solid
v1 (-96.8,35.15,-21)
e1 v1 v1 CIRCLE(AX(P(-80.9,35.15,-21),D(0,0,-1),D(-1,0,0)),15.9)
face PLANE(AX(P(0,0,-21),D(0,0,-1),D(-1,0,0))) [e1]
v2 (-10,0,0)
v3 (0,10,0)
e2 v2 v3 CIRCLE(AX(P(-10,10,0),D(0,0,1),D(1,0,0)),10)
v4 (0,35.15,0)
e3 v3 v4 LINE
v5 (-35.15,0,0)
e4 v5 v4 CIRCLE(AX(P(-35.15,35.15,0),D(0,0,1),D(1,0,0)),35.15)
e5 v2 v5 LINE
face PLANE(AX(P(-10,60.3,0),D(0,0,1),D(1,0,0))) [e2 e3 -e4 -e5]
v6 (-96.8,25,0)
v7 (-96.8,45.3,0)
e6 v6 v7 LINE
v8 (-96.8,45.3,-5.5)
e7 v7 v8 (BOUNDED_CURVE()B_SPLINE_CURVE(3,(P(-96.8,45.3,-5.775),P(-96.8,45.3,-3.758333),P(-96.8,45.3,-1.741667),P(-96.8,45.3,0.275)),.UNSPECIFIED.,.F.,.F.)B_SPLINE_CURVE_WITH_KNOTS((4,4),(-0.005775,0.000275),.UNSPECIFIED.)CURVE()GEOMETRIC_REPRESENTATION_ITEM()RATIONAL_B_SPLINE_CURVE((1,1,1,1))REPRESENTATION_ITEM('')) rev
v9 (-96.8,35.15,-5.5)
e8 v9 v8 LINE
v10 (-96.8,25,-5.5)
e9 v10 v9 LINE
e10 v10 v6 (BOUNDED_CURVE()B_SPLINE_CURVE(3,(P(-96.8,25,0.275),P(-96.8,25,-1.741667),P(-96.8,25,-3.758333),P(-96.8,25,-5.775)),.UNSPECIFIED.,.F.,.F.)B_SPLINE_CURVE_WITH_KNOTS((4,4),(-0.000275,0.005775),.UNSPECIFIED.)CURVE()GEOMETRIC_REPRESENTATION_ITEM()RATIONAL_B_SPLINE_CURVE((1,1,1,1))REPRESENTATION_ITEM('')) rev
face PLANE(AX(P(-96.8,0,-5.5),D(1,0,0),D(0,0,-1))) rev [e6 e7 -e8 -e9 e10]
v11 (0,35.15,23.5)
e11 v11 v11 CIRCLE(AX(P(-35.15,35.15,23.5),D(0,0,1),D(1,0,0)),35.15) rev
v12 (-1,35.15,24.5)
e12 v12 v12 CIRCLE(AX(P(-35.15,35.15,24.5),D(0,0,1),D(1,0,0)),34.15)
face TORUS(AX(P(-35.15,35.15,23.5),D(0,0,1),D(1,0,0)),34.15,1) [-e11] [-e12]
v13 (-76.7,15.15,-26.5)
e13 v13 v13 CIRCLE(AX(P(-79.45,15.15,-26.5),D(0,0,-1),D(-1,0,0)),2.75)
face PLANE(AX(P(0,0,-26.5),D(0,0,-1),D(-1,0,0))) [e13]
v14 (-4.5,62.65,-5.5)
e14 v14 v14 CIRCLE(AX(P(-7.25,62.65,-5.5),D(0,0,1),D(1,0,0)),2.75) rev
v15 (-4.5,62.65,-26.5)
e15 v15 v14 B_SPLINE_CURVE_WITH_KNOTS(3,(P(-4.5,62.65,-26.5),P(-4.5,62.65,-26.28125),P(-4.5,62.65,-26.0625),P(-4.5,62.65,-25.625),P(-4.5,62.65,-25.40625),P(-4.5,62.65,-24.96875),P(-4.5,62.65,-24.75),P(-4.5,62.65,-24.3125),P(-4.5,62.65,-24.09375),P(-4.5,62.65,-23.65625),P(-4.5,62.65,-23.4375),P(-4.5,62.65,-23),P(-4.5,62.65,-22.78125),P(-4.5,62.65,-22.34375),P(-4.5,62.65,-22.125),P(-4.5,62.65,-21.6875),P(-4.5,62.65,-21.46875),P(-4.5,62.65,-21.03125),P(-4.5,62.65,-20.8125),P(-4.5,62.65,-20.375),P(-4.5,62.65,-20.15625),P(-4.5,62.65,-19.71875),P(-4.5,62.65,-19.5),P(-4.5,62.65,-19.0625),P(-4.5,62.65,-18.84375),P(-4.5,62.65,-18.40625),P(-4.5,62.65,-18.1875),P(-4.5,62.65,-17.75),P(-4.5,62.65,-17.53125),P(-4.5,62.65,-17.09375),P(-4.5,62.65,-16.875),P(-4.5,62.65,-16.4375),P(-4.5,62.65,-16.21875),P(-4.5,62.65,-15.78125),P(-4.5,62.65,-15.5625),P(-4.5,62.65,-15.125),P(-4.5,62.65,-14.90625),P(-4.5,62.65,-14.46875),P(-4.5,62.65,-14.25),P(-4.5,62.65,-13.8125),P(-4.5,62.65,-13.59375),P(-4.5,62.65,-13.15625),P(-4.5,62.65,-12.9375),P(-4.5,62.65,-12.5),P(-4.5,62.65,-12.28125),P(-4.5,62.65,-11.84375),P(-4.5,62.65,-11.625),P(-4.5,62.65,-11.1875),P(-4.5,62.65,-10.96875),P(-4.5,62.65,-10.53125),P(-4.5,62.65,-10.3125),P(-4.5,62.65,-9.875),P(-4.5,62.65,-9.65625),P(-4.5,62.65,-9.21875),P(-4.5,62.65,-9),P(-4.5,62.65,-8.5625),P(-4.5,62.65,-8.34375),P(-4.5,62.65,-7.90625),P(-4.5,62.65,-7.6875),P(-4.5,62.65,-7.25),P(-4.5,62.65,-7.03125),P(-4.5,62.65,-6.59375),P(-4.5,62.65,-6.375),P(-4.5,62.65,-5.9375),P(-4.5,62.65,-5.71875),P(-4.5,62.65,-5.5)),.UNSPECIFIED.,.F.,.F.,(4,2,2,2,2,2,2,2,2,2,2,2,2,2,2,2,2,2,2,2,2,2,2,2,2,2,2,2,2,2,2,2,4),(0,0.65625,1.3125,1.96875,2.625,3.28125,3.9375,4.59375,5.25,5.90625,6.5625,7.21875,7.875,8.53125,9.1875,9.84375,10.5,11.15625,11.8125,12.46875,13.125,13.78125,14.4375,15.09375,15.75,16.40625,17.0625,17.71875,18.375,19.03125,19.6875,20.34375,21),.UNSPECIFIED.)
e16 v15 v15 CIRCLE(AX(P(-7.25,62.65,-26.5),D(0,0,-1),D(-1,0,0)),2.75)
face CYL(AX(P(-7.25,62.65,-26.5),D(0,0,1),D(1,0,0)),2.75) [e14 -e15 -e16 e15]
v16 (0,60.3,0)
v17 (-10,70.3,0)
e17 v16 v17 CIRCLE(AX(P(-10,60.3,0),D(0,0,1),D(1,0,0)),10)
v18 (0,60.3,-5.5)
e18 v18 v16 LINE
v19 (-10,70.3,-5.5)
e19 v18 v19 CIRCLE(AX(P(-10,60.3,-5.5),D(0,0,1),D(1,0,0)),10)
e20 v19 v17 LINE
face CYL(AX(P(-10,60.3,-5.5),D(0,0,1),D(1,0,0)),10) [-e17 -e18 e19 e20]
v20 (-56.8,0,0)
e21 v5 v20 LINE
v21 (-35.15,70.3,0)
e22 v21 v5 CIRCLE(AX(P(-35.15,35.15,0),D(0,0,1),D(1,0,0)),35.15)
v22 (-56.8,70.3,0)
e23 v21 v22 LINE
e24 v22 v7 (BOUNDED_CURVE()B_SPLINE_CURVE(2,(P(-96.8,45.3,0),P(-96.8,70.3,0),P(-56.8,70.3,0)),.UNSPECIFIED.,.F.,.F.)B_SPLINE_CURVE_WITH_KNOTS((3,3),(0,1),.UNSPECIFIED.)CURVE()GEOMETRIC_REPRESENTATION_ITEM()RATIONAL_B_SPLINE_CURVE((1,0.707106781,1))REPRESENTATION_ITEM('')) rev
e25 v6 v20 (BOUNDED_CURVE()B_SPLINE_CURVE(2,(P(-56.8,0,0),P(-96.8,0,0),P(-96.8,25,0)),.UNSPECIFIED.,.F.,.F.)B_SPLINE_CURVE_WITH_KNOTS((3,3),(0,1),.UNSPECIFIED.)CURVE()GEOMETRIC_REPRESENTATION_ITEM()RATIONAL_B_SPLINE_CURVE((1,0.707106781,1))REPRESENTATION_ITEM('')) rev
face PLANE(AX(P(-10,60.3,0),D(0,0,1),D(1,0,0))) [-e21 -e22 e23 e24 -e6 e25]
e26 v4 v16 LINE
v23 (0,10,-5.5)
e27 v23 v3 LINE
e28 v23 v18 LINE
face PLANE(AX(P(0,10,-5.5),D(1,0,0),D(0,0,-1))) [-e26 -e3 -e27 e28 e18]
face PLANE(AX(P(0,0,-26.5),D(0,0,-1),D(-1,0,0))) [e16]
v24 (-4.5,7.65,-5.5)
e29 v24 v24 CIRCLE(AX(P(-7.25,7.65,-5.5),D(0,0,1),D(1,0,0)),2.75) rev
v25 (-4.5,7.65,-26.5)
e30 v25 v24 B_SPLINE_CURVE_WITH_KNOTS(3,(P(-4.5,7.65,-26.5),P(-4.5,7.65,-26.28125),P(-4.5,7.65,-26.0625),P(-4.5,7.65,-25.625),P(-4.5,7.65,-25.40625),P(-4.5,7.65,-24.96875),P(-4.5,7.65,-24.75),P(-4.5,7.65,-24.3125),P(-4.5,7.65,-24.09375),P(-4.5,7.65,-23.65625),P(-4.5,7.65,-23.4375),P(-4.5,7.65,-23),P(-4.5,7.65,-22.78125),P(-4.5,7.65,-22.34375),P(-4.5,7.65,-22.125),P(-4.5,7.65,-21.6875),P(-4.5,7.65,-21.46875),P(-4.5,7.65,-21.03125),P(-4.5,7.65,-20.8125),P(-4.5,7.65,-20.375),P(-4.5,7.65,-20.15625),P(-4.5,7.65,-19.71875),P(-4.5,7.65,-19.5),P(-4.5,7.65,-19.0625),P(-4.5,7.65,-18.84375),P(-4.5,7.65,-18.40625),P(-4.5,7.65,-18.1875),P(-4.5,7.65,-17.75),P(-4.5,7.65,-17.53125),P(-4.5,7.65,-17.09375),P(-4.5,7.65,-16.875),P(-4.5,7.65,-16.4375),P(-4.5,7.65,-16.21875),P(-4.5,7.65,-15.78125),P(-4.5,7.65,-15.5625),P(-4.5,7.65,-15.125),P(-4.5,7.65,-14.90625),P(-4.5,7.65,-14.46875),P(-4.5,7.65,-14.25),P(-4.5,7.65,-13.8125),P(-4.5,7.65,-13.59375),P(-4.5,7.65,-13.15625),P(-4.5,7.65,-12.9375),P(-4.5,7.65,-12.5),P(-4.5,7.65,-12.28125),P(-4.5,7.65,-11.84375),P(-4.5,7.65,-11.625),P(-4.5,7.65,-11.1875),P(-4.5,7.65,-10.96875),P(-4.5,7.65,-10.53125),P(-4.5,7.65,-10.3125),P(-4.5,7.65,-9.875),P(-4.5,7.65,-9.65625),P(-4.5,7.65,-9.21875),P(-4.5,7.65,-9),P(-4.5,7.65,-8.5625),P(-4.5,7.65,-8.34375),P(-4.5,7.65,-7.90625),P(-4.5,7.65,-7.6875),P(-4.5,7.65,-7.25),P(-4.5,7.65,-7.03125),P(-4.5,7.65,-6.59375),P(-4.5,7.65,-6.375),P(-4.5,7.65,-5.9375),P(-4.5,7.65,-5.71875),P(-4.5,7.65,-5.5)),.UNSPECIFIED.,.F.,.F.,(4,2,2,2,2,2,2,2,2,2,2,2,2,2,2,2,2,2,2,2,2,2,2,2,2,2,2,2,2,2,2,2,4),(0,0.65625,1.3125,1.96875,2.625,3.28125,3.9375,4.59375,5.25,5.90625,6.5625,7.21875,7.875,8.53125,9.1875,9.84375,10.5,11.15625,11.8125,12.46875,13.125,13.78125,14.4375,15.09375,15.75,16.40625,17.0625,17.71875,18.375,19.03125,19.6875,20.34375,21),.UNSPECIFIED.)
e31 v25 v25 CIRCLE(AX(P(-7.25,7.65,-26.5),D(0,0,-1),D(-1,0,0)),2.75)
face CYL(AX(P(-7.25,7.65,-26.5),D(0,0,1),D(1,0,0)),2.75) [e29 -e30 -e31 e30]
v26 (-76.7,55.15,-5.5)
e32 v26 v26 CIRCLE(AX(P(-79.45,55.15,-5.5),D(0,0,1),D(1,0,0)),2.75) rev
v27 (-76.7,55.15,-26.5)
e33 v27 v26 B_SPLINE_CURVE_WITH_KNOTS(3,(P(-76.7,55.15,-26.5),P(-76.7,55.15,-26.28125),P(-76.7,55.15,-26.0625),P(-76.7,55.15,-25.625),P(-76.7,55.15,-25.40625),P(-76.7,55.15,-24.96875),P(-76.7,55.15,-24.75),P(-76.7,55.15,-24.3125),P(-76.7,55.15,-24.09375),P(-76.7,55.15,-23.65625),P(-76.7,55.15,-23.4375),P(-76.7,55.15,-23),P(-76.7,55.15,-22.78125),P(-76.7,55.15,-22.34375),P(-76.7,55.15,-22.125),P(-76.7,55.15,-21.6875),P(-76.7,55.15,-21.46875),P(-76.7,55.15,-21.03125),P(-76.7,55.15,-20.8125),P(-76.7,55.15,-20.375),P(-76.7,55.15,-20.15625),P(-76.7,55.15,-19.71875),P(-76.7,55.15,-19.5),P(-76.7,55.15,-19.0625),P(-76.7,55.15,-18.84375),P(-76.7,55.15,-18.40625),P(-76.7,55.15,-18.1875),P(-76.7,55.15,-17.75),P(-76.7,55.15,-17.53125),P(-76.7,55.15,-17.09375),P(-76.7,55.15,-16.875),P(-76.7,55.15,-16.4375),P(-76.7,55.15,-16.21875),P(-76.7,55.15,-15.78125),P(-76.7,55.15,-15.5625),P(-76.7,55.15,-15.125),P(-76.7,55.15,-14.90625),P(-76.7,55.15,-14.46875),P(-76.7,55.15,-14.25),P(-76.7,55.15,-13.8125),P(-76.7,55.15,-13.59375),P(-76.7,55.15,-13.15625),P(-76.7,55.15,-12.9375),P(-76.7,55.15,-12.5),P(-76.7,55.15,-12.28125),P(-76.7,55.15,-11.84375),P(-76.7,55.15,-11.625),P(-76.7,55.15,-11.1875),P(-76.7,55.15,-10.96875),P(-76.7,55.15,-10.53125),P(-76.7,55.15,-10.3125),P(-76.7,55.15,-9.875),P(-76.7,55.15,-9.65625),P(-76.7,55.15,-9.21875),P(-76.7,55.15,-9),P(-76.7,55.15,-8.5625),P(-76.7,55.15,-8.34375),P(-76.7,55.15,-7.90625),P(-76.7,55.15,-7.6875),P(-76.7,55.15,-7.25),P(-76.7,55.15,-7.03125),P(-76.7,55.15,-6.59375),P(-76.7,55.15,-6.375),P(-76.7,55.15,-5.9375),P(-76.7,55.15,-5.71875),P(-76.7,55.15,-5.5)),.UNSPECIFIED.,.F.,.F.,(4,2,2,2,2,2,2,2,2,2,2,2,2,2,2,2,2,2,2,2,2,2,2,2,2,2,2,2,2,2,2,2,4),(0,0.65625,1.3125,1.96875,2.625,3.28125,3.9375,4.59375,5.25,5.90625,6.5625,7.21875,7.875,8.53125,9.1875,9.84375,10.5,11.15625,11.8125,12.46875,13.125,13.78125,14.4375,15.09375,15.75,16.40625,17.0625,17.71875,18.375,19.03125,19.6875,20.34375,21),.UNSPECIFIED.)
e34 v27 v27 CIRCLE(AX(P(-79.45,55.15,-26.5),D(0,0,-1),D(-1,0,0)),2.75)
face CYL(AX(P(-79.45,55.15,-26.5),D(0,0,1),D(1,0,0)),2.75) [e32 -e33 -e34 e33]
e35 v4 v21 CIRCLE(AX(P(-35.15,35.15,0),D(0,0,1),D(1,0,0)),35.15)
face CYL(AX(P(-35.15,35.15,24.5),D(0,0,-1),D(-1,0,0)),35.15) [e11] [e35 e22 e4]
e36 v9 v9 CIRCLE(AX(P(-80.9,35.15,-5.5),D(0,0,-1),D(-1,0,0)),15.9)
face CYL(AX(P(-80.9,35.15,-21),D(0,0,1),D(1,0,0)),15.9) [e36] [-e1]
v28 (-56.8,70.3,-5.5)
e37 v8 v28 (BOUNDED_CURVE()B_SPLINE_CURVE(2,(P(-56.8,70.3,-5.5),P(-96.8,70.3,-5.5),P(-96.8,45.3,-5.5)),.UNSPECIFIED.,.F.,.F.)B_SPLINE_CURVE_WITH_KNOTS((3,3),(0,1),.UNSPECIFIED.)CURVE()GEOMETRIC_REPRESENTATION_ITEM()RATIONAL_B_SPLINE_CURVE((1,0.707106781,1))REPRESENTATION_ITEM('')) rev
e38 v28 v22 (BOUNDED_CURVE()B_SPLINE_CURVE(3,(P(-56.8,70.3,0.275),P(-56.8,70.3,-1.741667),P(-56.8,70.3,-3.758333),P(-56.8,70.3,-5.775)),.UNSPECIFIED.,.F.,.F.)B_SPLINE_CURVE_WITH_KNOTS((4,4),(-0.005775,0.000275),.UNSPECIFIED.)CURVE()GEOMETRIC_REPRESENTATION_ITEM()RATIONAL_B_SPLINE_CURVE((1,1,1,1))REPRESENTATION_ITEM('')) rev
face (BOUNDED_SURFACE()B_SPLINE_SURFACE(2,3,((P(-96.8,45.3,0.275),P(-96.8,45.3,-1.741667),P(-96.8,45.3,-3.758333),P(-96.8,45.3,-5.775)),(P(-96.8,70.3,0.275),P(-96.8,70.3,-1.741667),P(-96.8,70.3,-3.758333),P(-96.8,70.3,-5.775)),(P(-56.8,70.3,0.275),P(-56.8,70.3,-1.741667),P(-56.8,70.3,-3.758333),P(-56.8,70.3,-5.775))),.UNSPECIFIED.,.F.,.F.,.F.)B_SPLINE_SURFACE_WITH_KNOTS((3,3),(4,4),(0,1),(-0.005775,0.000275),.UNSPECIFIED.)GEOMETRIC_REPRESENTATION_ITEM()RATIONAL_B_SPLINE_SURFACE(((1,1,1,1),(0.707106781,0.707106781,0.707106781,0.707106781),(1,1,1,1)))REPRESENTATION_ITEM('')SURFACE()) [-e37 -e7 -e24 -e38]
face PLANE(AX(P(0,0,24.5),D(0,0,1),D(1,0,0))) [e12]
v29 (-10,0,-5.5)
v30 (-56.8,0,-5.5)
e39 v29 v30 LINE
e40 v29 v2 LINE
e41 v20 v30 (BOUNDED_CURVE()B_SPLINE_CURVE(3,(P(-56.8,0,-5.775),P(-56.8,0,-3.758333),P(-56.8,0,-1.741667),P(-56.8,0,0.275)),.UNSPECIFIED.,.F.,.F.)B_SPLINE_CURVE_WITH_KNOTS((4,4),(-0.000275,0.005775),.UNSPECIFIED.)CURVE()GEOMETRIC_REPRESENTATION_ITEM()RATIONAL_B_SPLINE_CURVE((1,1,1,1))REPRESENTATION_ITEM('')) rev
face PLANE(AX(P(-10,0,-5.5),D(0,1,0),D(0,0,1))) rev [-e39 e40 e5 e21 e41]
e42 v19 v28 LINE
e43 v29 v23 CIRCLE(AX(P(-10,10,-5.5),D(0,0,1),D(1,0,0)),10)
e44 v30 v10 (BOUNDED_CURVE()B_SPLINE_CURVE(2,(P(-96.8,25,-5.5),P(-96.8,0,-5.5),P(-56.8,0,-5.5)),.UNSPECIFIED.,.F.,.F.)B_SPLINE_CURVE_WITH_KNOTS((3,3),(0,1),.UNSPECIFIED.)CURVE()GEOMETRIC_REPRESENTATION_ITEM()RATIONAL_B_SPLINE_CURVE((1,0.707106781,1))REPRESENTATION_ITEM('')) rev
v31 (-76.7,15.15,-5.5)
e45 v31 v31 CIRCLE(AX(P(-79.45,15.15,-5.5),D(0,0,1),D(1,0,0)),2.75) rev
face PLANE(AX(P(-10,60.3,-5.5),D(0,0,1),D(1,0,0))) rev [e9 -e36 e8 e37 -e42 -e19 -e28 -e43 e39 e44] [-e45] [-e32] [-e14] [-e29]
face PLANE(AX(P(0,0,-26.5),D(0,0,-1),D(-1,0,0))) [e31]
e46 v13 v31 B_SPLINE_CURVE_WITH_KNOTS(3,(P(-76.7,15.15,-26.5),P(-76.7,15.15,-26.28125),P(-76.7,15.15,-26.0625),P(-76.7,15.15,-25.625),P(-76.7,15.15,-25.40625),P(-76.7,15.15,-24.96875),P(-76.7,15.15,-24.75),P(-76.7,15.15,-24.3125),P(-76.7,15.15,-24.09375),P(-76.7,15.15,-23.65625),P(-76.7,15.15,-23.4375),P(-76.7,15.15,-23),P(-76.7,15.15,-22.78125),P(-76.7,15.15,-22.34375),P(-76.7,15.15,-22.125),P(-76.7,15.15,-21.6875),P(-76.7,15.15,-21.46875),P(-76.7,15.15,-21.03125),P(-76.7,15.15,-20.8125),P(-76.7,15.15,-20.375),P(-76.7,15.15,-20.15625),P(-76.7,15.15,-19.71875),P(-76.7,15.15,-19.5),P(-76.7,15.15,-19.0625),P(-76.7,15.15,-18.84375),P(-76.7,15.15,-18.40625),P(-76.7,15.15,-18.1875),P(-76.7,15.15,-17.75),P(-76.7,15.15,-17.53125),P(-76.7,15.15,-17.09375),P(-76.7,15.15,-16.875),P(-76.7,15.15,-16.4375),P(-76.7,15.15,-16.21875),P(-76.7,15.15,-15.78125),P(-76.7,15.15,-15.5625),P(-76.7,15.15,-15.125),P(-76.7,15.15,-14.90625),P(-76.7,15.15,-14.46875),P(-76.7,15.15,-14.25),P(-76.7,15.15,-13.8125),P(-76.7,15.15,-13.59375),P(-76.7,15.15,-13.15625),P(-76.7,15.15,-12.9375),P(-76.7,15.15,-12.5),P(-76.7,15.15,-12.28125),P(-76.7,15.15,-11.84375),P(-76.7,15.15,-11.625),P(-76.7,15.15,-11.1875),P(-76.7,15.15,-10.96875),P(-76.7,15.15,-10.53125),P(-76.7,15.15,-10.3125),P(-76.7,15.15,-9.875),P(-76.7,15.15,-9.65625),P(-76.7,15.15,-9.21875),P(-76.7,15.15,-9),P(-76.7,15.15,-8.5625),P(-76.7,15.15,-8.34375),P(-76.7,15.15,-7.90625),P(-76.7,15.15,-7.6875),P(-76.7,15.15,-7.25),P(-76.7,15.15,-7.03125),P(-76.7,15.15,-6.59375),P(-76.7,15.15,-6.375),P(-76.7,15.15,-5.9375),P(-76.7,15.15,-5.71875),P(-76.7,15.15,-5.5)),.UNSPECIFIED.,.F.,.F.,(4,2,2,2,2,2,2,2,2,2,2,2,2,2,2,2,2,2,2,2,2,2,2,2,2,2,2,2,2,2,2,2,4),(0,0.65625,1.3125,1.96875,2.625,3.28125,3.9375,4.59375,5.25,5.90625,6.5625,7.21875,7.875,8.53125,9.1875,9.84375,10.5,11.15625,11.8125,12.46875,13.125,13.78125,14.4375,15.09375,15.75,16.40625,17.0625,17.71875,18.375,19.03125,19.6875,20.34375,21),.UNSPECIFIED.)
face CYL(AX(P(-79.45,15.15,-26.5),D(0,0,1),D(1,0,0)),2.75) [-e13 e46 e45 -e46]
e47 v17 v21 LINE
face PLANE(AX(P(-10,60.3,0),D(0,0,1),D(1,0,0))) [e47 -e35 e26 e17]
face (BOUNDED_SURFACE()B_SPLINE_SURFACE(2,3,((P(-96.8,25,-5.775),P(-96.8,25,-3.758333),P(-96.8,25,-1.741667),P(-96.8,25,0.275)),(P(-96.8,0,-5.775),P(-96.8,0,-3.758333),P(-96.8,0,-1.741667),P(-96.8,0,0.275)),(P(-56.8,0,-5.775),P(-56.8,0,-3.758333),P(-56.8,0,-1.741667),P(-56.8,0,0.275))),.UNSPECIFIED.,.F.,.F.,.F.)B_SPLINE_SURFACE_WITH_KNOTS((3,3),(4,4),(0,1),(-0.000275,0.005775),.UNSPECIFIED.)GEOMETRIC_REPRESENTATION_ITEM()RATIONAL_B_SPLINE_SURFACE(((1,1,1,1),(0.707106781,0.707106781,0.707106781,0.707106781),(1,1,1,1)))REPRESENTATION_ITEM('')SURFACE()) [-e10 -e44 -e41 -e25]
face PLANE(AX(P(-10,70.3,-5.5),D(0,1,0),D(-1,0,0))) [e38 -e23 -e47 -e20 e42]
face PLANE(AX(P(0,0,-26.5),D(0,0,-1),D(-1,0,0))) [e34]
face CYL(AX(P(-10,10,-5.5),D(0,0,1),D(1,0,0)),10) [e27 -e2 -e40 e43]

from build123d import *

# Parameters (mm, degrees)
EXTRUDE_1_DEPTH = 5.5
EXTRUDE_2_DEPTH = 24.5
FILLET_1_SIZE   = 25
FILLET_1_SIZE_2 = 40
EXTRUDE_3_DEPTH = 15.5
SKETCH_2_3_R    = 2.750000000000008
SKETCH_2_3_R_2  = 2.7499999999999982
SKETCH_2_3_R_3  = 2.7499999999999987
SKETCH_2_3_R_4  = 2.7500000000000084
EXTRUDE_4_DEPTH = 21


with BuildPart() as part:
    # 草图1 → 凸台-拉伸1 (new body)
    with BuildSketch(Plane.XY):
        with BuildLine():
            Line((-10.000000000000071, 0), (-96.8, 0))
            Line((-96.8, 0), (-96.8, 70.29999999999998))
            Line((-96.8, 70.29999999999998), (-10.000000000000071, 70.3))
            ThreePointArc((-10.000000000000071, 70.3), (-2.928932188134527, 67.37106781186547), (0, 60.29999999999993))
            Line((0, 60.29999999999993), (0, 10.000000000000071))
            ThreePointArc((0, 10.000000000000071), (-2.9289321881345236, 2.9289321881345245), (-10.000000000000071, 0))
        make_face()
    extrude(amount=-EXTRUDE_1_DEPTH)

    # 草图1<4> → 凸台-拉伸2 (add)
    with BuildSketch(Plane.XY):
        with BuildLine():
            ThreePointArc((-35.15, 70.29999999999998), (-70.3, 35.15), (-35.150000000000006, -7.11e-15))
            Line((-35.15, 0), (-35.15, 70.3))
        make_face()
        with BuildLine():
            Line((-35.15, 70.3), (-35.15, 0))
            ThreePointArc((-35.150000000000006, -7.11e-15), (-10.295196641292861, 10.29519664129284), (0, 35.149999999999984))
            ThreePointArc((0, 35.14999999999999), (-10.295196641292854, 60.004803358707136), (-35.15, 70.29999999999998))
        make_face()
    extrude(amount=EXTRUDE_2_DEPTH)

    # 圆角1
    # a fillet whose section is not a circle: 40, 25 mm, written as the material it takes off along each edge
    with BuildSketch(Plane(origin=(-96.8, 70.29999999999998, 100.00000000000001), x_dir=(0, -1, 0), z_dir=(0, 0, -1))) as fillet_1_piece_1:
        with BuildLine():
            Bezier((FILLET_1_SIZE, 0), (0, 0), (0, -FILLET_1_SIZE_2), weights=[1, 0.7071067811865476, 1])
            Line((0, -FILLET_1_SIZE_2), (0, 0))
            Line((0, 0), (FILLET_1_SIZE, 0))
        make_face()
    extrude(amount=205.50000000000003, mode=Mode.SUBTRACT)
    with BuildSketch(Plane(origin=(-96.8, 0, 100.00000000000001), x_dir=(1, 0, 0), z_dir=(0, 0, -1))) as fillet_1_piece_2:
        with BuildLine():
            Bezier((FILLET_1_SIZE_2, 0), (0, 0), (0, -FILLET_1_SIZE), weights=[1, 0.7071067811865476, 1])
            Line((0, -FILLET_1_SIZE), (0, 0))
            Line((0, 0), (FILLET_1_SIZE_2, 0))
        make_face()
    extrude(amount=205.50000000000003, mode=Mode.SUBTRACT)

    # 圆角2: read off the stored shape, not the designer's step
    # 圆角2 outline → 圆角2 (revolve, cut)
    with BuildSketch(Plane(origin=(-35.15, 35.15, 0), x_dir=(1, 0, 0), z_dir=(0, -1, 0))):
        with BuildLine():
            ThreePointArc((34.15, 24.5), (34.857106781, 24.207106781), (35.15, 23.5))
            Line((35.15, 23.5), (35.15, 24.5))
            Line((35.15, 24.5), (34.15, 24.5))
        make_face()
    revolve(axis=Axis((-35.15, 35.15, 0), (0, 0, 1)), mode=Mode.SUBTRACT)

    # 草图2 → 凸台-拉伸3 (add)
    with BuildSketch(Plane(origin=(0, 0, -5.5), x_dir=(-1, 0, 0), z_dir=(0, 0, -1))):
        with BuildLine():
            ThreePointArc((65, 35.14999999999999), (80.9, 19.249999999999993), (96.80000000000001, 35.149999999999984))
            Line((96.8, 35.15), (65, 35.149999999999984))
        make_face()
        with BuildLine():
            Line((65, 35.149999999999984), (96.8, 35.15))
            ThreePointArc((96.80000000000001, 35.14999999999999), (80.9, 51.04999999999999), (65, 35.14999999999999))
        make_face()
    extrude(amount=EXTRUDE_3_DEPTH)

    # 草图2<3> → 凸台-拉伸4 (add)
    with BuildSketch(Plane(origin=(0, 0, -5.5), x_dir=(-1, 0, 0), z_dir=(0, 0, -1))):
        with Locations(Location((79.45, 15.149999999999999, 0), (0, 0, 180))):
            Circle(SKETCH_2_3_R)
        with Locations(Location((7.250000000000006, 7.64999999999999, 0), (0, 0, 180))):
            Circle(SKETCH_2_3_R_2)
        with Locations(Location((7.249999999999993, 62.65, 0), (0, 0, 180))):
            Circle(SKETCH_2_3_R_3)
        with Locations(Location((79.44999999999999, 55.15, 0), (0, 0, 180))):
            Circle(SKETCH_2_3_R_4)
    extrude(amount=EXTRUDE_4_DEPTH)


solid = part.part
